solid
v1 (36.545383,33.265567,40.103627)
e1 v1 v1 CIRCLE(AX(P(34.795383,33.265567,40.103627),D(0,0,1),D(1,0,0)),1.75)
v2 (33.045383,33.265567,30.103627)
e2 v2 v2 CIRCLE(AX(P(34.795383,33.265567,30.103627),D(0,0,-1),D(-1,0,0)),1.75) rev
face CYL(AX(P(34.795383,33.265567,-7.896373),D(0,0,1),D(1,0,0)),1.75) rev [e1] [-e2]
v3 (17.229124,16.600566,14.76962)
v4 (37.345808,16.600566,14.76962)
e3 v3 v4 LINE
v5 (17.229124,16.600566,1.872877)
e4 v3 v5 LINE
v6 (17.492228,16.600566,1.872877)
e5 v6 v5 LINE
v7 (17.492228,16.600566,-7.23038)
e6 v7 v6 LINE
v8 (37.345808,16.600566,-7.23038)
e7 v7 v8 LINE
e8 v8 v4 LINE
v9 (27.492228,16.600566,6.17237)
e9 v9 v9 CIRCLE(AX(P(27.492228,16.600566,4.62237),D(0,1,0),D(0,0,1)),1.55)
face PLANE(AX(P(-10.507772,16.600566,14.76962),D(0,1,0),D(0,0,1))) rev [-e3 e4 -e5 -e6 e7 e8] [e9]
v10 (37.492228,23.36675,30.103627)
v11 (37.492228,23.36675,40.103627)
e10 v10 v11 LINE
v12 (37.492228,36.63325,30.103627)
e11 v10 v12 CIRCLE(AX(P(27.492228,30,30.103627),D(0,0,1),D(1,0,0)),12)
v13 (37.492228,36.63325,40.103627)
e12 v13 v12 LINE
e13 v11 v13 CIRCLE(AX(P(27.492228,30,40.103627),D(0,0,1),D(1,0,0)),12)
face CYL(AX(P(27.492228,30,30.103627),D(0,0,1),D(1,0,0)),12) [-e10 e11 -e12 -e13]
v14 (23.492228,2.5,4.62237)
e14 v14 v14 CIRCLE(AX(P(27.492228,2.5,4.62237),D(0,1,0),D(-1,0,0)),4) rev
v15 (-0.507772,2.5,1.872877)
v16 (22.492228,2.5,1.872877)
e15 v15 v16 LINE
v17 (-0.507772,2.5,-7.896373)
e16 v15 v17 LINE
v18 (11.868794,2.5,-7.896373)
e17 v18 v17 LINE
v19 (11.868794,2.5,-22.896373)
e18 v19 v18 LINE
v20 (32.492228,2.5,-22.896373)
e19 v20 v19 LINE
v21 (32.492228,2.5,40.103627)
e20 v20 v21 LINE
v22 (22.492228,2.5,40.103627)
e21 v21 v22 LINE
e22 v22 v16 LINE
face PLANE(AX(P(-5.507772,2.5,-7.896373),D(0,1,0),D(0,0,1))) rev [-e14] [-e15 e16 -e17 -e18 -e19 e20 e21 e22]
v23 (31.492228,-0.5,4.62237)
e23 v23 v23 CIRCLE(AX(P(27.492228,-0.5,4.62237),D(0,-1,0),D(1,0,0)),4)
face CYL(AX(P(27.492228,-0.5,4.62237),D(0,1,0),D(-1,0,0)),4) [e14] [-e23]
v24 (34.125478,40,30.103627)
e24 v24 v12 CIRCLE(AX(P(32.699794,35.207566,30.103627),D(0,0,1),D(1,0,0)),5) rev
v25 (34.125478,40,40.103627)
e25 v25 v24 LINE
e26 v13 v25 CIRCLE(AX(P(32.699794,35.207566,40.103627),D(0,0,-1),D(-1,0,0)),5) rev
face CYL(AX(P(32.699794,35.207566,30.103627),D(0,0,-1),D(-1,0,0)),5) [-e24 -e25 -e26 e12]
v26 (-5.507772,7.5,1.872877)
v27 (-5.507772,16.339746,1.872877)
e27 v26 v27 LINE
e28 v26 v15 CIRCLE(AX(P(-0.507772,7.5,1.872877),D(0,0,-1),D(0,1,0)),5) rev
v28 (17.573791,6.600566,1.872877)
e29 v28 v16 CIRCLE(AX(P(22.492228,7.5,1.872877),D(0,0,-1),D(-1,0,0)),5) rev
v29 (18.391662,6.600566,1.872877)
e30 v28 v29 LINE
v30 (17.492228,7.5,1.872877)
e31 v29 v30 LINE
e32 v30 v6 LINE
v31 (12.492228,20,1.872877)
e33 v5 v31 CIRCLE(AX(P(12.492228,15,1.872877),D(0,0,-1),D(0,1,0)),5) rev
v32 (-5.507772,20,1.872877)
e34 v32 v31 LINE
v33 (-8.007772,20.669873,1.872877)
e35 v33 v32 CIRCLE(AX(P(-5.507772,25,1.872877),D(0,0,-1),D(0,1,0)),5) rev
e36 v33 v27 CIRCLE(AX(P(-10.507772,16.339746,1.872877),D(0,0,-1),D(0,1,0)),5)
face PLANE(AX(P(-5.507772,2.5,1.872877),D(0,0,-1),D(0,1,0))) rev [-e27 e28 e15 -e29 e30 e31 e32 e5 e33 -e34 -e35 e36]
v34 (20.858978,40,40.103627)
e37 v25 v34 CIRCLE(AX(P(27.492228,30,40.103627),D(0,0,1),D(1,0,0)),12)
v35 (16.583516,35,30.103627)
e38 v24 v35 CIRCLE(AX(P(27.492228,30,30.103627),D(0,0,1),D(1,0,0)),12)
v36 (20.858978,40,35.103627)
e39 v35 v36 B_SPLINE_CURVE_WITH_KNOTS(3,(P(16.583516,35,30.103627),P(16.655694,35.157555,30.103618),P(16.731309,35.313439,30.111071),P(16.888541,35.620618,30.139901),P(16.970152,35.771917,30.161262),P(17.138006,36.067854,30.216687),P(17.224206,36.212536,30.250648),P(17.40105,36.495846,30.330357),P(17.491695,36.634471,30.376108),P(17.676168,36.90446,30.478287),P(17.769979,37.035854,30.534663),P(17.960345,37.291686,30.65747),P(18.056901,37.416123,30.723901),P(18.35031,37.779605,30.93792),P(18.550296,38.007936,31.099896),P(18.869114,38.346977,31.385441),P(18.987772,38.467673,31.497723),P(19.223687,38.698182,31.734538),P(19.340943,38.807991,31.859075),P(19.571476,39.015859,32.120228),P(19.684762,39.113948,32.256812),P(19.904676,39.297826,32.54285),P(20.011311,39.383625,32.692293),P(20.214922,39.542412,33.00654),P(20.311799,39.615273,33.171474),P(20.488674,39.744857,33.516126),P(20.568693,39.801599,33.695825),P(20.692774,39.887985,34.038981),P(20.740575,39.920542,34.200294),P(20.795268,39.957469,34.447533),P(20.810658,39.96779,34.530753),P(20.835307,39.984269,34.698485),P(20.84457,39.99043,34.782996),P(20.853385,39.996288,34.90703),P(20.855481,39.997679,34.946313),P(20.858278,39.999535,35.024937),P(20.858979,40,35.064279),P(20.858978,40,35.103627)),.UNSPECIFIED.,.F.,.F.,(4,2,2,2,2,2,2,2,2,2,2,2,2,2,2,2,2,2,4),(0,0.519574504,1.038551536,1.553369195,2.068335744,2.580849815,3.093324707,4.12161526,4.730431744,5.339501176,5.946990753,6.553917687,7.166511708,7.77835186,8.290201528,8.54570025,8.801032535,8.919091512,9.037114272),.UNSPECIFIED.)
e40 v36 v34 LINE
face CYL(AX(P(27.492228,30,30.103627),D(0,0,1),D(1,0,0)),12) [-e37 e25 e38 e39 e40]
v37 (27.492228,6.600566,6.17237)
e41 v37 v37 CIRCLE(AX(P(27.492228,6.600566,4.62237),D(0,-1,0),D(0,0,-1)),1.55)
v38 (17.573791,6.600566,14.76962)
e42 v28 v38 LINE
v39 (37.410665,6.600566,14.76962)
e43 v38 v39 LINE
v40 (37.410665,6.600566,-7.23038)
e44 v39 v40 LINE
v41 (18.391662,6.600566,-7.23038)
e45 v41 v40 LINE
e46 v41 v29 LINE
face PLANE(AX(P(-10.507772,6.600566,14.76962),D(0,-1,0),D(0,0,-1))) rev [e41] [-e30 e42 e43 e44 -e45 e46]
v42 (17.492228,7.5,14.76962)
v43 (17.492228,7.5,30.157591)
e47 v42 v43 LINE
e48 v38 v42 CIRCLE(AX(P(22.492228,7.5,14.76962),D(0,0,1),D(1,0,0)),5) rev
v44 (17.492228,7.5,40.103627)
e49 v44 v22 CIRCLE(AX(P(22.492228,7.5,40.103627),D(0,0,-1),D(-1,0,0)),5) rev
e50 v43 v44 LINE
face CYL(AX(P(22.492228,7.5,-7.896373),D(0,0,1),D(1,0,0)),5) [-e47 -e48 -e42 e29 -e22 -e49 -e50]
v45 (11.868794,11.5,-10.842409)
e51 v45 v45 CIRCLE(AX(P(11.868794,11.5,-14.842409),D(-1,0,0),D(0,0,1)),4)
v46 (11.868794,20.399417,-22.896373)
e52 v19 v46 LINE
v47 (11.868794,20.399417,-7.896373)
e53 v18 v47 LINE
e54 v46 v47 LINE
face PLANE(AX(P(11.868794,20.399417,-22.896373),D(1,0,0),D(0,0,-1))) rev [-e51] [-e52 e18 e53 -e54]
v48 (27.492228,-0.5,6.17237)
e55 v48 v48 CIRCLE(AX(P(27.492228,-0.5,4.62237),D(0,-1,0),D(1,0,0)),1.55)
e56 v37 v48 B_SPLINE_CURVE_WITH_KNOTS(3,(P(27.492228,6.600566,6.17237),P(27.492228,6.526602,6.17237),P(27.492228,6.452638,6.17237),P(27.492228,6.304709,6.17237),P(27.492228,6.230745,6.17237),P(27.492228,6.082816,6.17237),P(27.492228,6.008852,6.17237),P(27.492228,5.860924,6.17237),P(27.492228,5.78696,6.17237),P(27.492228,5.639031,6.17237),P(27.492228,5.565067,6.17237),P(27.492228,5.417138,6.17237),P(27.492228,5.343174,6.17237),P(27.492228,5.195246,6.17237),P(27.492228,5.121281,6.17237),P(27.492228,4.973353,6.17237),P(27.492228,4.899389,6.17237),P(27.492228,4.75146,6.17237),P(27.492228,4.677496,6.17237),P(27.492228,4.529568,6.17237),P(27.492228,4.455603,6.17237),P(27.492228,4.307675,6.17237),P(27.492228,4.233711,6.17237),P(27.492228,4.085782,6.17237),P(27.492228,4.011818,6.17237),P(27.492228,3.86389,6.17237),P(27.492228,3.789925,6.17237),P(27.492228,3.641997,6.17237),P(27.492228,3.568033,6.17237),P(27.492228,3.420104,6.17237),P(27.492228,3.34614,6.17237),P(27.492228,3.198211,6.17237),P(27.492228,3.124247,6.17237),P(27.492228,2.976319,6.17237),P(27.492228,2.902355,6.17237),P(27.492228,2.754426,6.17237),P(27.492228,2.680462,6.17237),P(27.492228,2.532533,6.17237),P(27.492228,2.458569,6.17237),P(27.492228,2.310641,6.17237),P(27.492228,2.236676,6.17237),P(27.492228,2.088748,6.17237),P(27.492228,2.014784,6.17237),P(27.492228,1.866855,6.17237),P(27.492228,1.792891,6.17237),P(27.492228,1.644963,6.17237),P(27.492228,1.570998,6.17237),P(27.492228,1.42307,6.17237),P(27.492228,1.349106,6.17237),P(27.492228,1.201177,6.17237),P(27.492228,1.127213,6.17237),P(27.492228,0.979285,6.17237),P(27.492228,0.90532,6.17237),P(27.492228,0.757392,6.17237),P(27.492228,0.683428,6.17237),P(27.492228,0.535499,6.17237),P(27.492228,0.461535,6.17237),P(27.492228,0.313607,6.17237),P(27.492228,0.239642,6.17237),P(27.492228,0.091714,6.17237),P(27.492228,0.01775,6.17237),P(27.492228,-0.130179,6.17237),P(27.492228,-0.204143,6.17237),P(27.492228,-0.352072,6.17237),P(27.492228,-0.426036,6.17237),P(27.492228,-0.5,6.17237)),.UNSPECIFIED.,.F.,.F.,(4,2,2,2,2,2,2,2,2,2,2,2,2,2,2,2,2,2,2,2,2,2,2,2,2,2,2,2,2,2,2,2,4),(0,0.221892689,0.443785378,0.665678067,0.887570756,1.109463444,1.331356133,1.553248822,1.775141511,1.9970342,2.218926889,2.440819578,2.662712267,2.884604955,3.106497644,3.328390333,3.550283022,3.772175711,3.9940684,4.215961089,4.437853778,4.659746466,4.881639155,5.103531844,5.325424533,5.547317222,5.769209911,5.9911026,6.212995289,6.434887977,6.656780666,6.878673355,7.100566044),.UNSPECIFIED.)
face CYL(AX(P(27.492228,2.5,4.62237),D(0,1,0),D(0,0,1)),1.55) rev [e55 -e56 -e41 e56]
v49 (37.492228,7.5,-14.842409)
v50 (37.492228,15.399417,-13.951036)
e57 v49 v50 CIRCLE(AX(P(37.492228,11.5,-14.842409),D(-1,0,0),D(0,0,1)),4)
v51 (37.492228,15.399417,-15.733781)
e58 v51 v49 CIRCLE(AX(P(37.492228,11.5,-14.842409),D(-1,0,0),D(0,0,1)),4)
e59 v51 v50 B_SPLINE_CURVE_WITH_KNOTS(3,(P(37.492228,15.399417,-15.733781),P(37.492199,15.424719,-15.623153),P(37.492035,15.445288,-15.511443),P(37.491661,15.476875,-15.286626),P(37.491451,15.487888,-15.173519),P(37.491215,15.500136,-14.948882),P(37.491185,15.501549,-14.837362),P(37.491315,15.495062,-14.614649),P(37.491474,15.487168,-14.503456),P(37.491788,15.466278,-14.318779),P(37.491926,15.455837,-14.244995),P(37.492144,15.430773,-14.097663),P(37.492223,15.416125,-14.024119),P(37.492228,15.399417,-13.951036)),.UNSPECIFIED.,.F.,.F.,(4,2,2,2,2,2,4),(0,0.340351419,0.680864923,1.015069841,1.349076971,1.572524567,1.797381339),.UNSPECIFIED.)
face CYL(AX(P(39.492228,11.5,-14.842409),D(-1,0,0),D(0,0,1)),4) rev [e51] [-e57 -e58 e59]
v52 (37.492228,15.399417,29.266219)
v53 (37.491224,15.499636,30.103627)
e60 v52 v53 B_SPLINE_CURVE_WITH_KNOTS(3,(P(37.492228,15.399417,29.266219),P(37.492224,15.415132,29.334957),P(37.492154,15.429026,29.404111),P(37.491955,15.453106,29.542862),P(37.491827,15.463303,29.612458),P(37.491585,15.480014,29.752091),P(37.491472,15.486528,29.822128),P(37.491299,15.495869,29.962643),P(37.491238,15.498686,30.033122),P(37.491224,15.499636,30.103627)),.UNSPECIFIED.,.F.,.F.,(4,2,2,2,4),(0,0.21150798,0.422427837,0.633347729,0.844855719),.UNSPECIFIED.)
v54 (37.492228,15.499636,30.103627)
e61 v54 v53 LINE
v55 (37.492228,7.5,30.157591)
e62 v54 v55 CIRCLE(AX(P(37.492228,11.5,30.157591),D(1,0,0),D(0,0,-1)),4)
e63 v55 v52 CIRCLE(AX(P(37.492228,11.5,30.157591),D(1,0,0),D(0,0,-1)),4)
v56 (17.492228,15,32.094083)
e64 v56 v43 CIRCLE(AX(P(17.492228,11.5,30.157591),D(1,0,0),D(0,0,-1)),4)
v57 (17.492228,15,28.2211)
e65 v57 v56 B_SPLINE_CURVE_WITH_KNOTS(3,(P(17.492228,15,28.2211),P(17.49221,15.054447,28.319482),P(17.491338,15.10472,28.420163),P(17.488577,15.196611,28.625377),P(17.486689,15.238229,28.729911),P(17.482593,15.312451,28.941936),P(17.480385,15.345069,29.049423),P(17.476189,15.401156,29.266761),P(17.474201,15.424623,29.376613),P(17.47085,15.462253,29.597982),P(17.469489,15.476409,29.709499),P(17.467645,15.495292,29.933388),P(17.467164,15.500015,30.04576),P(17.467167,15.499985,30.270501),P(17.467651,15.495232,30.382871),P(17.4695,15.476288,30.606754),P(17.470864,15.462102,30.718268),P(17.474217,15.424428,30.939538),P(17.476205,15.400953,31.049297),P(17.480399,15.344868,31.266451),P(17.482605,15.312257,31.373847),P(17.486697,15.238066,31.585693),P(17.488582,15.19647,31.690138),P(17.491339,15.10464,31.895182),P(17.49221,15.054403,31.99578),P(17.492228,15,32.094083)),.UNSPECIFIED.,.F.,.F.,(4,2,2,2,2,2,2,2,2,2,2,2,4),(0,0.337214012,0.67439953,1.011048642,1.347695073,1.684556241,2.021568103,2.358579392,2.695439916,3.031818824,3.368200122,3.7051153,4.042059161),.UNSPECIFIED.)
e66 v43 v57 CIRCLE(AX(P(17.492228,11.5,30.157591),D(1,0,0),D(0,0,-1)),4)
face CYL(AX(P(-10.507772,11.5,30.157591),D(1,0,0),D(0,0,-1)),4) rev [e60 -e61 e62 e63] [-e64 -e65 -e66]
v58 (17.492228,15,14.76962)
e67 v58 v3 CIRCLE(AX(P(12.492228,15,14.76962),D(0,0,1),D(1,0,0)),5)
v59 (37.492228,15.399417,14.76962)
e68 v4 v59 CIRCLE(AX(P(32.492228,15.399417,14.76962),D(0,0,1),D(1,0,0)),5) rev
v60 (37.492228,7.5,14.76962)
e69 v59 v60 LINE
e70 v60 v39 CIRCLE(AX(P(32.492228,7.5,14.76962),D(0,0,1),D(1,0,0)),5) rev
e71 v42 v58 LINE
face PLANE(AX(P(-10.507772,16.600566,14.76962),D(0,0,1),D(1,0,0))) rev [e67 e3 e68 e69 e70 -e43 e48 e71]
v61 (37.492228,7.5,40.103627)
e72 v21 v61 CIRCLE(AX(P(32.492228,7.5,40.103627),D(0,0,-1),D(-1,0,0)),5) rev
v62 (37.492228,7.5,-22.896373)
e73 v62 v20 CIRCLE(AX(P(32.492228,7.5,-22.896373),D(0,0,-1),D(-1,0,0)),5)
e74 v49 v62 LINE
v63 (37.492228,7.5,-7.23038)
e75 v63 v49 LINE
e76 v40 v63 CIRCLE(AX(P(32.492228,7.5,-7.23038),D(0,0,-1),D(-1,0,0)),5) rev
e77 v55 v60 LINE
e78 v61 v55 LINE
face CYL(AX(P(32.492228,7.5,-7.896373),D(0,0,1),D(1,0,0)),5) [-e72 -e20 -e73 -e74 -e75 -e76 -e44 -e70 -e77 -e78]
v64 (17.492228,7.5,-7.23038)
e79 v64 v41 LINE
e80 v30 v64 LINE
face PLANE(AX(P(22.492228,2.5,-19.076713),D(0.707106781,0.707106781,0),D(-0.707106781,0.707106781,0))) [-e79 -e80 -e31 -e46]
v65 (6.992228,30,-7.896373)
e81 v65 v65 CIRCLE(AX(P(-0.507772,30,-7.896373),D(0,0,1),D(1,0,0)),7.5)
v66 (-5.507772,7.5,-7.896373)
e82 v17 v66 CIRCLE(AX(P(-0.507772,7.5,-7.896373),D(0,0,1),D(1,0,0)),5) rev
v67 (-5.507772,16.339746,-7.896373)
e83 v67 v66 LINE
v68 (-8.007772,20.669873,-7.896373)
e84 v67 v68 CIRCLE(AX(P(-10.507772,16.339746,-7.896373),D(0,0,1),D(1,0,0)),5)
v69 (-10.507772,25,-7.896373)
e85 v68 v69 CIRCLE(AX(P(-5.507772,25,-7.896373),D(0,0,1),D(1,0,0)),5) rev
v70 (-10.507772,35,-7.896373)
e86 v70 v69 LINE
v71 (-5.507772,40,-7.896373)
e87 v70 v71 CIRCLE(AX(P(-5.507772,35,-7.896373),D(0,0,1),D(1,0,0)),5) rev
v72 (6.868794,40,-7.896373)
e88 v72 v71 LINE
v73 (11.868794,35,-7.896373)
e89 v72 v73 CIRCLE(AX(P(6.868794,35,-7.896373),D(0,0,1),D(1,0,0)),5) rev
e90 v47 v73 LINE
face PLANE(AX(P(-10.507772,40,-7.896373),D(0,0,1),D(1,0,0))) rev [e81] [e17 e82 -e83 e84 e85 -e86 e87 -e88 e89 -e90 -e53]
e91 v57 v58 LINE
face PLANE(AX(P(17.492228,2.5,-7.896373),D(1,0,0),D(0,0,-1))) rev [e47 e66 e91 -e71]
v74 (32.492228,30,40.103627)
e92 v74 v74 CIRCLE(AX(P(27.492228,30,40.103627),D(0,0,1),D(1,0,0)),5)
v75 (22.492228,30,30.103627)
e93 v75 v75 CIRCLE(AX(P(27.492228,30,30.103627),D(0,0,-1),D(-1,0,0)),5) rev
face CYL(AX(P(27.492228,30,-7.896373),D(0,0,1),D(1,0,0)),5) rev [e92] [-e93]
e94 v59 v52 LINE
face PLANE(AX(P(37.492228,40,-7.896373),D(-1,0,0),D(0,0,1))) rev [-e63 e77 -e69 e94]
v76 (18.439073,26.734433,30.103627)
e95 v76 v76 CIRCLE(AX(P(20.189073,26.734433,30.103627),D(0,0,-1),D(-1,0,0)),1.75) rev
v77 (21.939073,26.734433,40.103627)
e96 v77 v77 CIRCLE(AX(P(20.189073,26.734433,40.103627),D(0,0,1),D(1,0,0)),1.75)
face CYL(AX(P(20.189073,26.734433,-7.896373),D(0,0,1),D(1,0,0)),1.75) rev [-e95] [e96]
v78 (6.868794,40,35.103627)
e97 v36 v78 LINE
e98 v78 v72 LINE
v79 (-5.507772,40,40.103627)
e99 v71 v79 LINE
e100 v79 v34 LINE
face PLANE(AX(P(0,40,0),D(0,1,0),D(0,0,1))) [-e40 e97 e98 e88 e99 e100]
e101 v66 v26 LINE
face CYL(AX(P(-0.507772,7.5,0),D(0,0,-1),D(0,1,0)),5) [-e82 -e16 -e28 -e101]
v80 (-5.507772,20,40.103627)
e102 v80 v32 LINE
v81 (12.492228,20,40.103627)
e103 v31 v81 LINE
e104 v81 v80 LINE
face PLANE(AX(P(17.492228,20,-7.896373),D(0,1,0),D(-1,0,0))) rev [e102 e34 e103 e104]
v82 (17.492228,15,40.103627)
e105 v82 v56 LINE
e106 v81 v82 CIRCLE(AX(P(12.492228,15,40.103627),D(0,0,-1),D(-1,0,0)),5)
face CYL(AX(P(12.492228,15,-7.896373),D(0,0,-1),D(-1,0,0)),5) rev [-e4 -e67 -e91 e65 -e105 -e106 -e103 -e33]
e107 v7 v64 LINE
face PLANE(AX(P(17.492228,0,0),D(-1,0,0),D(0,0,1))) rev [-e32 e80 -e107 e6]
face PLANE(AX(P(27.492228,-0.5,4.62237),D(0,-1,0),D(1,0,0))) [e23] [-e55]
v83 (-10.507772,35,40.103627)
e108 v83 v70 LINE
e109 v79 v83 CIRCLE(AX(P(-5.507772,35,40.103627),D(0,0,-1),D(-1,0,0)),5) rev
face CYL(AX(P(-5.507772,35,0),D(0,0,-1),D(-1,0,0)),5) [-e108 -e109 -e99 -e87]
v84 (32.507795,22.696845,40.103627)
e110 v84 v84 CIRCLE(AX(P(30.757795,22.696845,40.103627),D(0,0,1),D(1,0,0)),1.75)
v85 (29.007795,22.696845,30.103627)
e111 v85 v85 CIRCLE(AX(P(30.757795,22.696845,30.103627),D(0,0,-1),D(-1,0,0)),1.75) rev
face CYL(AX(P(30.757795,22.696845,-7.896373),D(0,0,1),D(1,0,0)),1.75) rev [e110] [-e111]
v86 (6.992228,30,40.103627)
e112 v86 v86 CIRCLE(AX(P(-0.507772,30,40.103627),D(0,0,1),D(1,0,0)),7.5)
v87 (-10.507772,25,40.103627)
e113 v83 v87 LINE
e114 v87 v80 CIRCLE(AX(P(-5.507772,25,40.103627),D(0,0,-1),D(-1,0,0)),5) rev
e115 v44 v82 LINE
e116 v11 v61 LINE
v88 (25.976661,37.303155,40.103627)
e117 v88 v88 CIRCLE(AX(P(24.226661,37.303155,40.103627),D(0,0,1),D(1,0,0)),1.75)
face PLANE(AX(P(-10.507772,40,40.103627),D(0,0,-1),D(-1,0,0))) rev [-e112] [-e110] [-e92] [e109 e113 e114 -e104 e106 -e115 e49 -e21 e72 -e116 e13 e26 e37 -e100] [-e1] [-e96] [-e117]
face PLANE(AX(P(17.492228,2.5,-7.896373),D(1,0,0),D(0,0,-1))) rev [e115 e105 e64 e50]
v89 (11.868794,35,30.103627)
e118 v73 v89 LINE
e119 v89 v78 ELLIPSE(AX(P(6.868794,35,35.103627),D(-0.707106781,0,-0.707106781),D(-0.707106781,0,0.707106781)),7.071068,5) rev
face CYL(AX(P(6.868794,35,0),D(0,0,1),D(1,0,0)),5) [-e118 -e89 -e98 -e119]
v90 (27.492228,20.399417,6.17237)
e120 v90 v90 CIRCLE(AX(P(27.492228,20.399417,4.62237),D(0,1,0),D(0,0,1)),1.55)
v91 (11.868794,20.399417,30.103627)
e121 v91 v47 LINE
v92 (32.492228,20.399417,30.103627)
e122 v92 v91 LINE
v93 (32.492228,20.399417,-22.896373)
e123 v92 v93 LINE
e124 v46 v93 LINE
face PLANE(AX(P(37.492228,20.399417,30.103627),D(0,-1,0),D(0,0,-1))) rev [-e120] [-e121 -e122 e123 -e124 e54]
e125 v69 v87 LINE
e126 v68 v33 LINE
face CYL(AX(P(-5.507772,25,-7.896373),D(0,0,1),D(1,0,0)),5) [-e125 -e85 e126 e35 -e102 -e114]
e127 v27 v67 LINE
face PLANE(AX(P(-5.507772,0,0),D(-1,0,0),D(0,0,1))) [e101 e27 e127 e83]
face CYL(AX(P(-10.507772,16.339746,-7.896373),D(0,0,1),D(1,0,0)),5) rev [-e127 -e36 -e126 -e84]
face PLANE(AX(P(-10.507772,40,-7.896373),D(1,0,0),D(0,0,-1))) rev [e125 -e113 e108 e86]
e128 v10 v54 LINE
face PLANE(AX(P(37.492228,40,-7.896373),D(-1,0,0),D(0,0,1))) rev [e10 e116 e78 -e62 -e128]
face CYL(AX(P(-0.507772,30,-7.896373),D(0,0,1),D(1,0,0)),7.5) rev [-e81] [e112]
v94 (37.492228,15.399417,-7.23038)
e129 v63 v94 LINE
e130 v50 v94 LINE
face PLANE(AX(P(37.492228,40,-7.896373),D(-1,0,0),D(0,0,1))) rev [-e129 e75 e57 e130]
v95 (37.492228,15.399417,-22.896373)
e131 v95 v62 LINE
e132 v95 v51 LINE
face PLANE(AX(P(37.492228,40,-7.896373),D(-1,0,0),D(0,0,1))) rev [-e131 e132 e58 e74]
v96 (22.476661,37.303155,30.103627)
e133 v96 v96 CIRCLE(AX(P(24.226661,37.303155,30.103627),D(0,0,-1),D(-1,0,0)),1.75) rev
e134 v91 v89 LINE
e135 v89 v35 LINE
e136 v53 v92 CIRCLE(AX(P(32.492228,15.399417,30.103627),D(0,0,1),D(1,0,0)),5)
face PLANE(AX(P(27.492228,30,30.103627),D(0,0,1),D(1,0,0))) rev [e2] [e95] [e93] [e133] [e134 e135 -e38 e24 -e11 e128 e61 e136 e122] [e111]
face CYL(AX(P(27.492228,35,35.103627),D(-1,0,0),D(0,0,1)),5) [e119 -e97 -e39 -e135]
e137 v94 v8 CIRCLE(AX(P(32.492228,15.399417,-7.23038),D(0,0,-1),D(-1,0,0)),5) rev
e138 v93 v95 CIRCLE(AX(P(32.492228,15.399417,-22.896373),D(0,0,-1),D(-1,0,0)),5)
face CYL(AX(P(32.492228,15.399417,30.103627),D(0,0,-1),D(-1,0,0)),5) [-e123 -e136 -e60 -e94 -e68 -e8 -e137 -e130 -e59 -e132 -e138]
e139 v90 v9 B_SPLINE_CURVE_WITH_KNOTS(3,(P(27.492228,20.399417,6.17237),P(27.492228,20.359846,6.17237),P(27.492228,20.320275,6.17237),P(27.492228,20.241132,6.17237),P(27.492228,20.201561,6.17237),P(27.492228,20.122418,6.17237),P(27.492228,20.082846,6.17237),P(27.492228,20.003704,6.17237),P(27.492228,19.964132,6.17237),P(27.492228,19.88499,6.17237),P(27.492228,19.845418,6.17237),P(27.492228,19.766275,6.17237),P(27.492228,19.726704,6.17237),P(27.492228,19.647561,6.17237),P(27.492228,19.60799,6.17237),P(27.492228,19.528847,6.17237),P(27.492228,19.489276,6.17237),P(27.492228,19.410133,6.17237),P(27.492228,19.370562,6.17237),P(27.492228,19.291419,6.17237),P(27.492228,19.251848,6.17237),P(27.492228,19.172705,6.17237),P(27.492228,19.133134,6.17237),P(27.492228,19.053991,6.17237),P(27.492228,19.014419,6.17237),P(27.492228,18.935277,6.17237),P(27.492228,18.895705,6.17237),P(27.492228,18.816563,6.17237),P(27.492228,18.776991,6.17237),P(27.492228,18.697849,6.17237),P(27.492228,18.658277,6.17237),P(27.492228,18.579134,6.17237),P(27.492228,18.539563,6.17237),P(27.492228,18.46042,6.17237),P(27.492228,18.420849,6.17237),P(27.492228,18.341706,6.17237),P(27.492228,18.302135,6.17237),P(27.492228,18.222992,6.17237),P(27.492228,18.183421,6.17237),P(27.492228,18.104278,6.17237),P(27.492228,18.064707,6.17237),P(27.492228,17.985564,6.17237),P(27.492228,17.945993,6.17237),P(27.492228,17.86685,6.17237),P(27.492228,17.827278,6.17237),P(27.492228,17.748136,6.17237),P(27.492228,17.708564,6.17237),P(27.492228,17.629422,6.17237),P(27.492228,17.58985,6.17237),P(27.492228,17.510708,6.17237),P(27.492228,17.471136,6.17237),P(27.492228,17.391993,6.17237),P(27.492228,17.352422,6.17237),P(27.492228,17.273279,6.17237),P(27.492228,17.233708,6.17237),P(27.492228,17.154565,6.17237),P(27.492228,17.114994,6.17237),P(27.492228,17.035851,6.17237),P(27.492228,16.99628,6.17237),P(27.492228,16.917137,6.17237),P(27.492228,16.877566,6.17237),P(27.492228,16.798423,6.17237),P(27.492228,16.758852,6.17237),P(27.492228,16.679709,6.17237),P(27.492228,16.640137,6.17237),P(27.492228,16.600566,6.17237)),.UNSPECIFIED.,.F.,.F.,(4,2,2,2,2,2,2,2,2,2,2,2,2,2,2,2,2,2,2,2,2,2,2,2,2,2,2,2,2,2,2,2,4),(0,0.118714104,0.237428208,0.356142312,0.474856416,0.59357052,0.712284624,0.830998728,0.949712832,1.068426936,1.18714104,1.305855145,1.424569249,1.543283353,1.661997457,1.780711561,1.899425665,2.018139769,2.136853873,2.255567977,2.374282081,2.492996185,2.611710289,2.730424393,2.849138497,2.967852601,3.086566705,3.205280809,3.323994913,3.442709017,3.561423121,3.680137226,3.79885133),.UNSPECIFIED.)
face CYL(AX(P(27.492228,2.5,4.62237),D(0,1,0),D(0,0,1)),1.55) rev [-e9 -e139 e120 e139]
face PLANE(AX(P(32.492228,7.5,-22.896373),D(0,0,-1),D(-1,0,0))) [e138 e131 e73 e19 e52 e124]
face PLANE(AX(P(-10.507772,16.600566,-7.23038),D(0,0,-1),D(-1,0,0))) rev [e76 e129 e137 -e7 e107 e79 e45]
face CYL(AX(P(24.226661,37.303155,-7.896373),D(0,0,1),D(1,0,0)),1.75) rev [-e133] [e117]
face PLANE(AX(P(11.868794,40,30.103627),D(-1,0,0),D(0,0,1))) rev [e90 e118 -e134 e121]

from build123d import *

# Parameters (mm, degrees)
EXTRUDE_1_DEPTH      = 40
SKETCH_2_R           = 7.5
SKETCH_2_R_2         = 4.9999999999999964
SKETCH_2_R_3         = 1.7500000000003626
SKETCH_2_R_4         = 1.7500000000004823
SKETCH_2_R_5         = 1.7500000000000004
SKETCH_2_R_6         = 1.7500000000001783
CUT_EXTRUDE_1_DEPTH  = 73.86746296427441
SKETCH_3_R           = 12.000000000543196
SKETCH_3_R_2         = 5.500000000543195
SKETCH_3_R_3         = 1.750000000000366
SKETCH_3_R_4         = 1.7500000000000004
SKETCH_3_R_5         = 1.7500000000001772
SKETCH_3_R_6         = 1.7500000000004823
EXTRUDE_3_DEPTH      = 10
SKETCH_4_W           = 25.62343390414386
SKETCH_4_H           = 19.600582626289906
CUT_EXTRUDE_2_DEPTH  = 38.00000000000001
FILLET_1_R           = 5
SKETCH_5_W           = 22
SKETCH_5_H           = 10
CUT_EXTRUDE_3_DEPTH  = 76.3412297087783
CUT_EXTRUDE_4_DEPTH  = 76.01757174727166
FILLET_2_R           = 5
EXTRUDE_4_DEPTH      = 23.000000000000007
FILLET_3_R           = 5
FILLET_4_R           = 5
SKETCH_8_R           = 1.5500000000000012
CUT_EXTRUDE_5_DEPTH  = 61.28699815842466
SKETCH_10_R          = 3.9999999999990434
SKETCH_10_R_2        = 1.5500000001559846
EXTRUDE_6_DEPTH      = 3
EXTRUDE_7_DEPTH      = 9.769249944
SKETCH_14_R          = 4.00000000000006
CUT_EXTRUDE_7_DEPTH  = 76.341229817754
EXTRUDE_8_DEPTH      = 15
SKETCH_18_R          = 3.999999999998341
CUT_EXTRUDE_10_DEPTH = 65.30672601787643
SKETCH_16_R          = 3.9999999998192686
CUT_EXTRUDE_8_DEPTH  = 76.341229817754


# Some blends are built 0.0001 mm under size
with BuildPart() as part:
    # 草图1 → 凸台-拉伸1 (new body)
    with BuildSketch(Plane(origin=(0, 0, 0), x_dir=(1, 0, 0), z_dir=(0, 1, 0))):
        Polygon((-10.50777202072539, 7.896373056994778), (37.49222797927462, 7.896373056994778), (37.492227979274624, -40.10362694300522), (-10.507772020725387, -40.10362694300522), align=None)
    extrude(amount=EXTRUDE_1_DEPTH)

    # 草图2 → 切除-拉伸1 (cut, through all)
    with BuildSketch(Plane.XY.offset(40.10362694300522)):
        with Locations((-0.5077720207253867, 30)):
            Circle(SKETCH_2_R)
        with Locations((27.492227979274613, 30)):
            Circle(SKETCH_2_R_2)
        with Locations((24.22666093119229, 37.303154924739225)):
            Circle(SKETCH_2_R_3)
        with Locations((34.79538290399571, 33.26556704810026)):
            Circle(SKETCH_2_R_4)
        with Locations((20.18907305455331, 26.7344329519358)):
            Circle(SKETCH_2_R_5)
        with Locations((30.75779502735674, 22.696845075296828)):
            Circle(SKETCH_2_R_6)
    extrude(amount=-CUT_EXTRUDE_1_DEPTH, mode=Mode.SUBTRACT)

    # 草图3 → 凸台-拉伸3 (add)
    with BuildSketch(Plane.XY.offset(40.10362694300522)):
        with Locations((27.492227979274418, 30.00000000001826)):
            Circle(SKETCH_3_R)
        with Locations((27.492227979274418, 30.00000000001826)):
            Circle(SKETCH_3_R_2, mode=Mode.SUBTRACT)
        with Locations((24.22666093119229, 37.30315492473925)):
            Circle(SKETCH_3_R_3, mode=Mode.SUBTRACT)
        with Locations((20.18907305455331, 26.734432951935826)):
            Circle(SKETCH_3_R_4, mode=Mode.SUBTRACT)
        with Locations((30.75779502735674, 22.696845075296856)):
            Circle(SKETCH_3_R_5, mode=Mode.SUBTRACT)
        with Locations((34.79538290399571, 33.26556704810028)):
            Circle(SKETCH_3_R_6, mode=Mode.SUBTRACT)
    extrude(amount=-EXTRUDE_3_DEPTH)

    # 草图4 → 切除-拉伸2 (cut)
    with BuildSketch(Plane(origin=(0, 0, -7.896373056994778), x_dir=(-1, 0, 0), z_dir=(0, 0, -1))):
        with Locations((-24.680511027202687, 30.199708686855047)):
            Rectangle(SKETCH_4_W, SKETCH_4_H)
    extrude(amount=-CUT_EXTRUDE_2_DEPTH, mode=Mode.SUBTRACT)

    # 圆角1
    # the kernel refuses this fillet: 5 mm, written as the material it takes off along each edge
    with BuildSketch(Plane(origin=(37.492227979274624, 40, 21.686750897283794), x_dir=(0, -1, 0), z_dir=(1.5e-16, 0, 1))) as fillet_1_piece_1:
        with BuildLine():
            CenterArc((4.792434215535032, -4.792434215539004), FILLET_1_R, 106.56702352707134, 56.8659529456977)
            Line((0, -3.366750418279196), (0, 0))
            Line((0, 0), (3.366750418288575, 0))
        make_face()
    extrude(amount=26.833752091442854, mode=Mode.SUBTRACT)

    # 草图5 → 切除-拉伸3 (cut, through all)
    with BuildSketch(Plane(origin=(37.49222797927462, 0, -5.42e-15), x_dir=(-1.4e-16, 0, -1), z_dir=(1, 0, -1.4e-16))):
        with Locations((-3.7696196746029966, 11.600566044145527)):
            Rectangle(SKETCH_5_W, SKETCH_5_H)
    extrude(amount=-CUT_EXTRUDE_3_DEPTH, mode=Mode.SUBTRACT)

    # 草图6 → 切除-拉伸4 (cut, through all)
    with BuildSketch(Plane.XY.offset(40.10362694300522)):
        Polygon((37.492227979274624, 0), (37.492227979274624, 2.5000000000259677), (17.492227979274624, 2.5000000000259655), (17.492227979274624, 20.000000000000004), (-10.507772020725385, 20), (-10.507772020725387, 0), align=None)
    extrude(amount=-CUT_EXTRUDE_4_DEPTH, mode=Mode.SUBTRACT)

    # 圆角2
    # the kernel refuses this fillet: 5 mm, written as the material it adds along each edge
    with BuildSketch(Plane(origin=(17.492227979274624, 20.000000000000004, 40.10362694300522), x_dir=(-1, 0, 0), z_dir=(0, 0, -1))) as fillet_2_piece_1_section:
        with BuildLine():
            CenterArc((FILLET_2_R, -FILLET_2_R), FILLET_2_R, 90, 90)
            Line((0, -FILLET_2_R), (0, 0))
            Line((0, 0), (FILLET_2_R, 0))
        make_face()
    fillet_2_piece_1 = extrude(amount=47.99999999999999, mode=Mode.PRIVATE)
    fillet_2_piece_1 = split(fillet_2_piece_1, bisect_by=Plane(origin=(17.49222797927462, 20.000000000000004, 14.769619674602993), z_dir=(1.4e-16, 0, 1)), keep=Keep.TOP, mode=Mode.PRIVATE)
    fillet_2_piece_1 = split(fillet_2_piece_1, bisect_by=Plane(origin=(17.492227979274624, 16.600566044145527, 40.10362694300522), z_dir=(0, 1, 0)), keep=Keep.TOP, mode=Mode.PRIVATE)
    add(fillet_2_piece_1)
    with BuildSketch(Plane(origin=(17.492227979274624, 20.000000000000004, 40.10362694300522), x_dir=(-1, 0, 0), z_dir=(0, 0, -1))) as fillet_2_piece_2_section:
        with BuildLine():
            CenterArc((FILLET_2_R, -FILLET_2_R), FILLET_2_R, 90, 90)
            Line((0, -FILLET_2_R), (0, 0))
            Line((0, 0), (FILLET_2_R, 0))
        make_face()
    fillet_2_piece_2 = extrude(amount=47.99999999999999, mode=Mode.PRIVATE)
    fillet_2_piece_2 = split(fillet_2_piece_2, bisect_by=Plane(origin=(17.49222797927462, 20.000000000000004, 14.769619674602993), z_dir=(1.4e-16, 0, 1)), keep=Keep.TOP, mode=Mode.PRIVATE)
    fillet_2_piece_2 = split(fillet_2_piece_2, bisect_by=Plane(origin=(17.492227979274624, 16.600566044145527, 40.10362694300522), z_dir=(0, -1, 0)), keep=Keep.TOP, mode=Mode.PRIVATE)
    add(fillet_2_piece_2)
    with BuildSketch(Plane(origin=(17.492227979274624, 20.000000000000004, 40.10362694300522), x_dir=(-1, 0, 0), z_dir=(0, 0, -1))) as fillet_2_piece_3_section:
        with BuildLine():
            CenterArc((FILLET_2_R, -FILLET_2_R), FILLET_2_R, 90, 90)
            Line((0, -FILLET_2_R), (0, 0))
            Line((0, 0), (FILLET_2_R, 0))
        make_face()
    fillet_2_piece_3 = extrude(amount=47.99999999999999, mode=Mode.PRIVATE)
    fillet_2_piece_3 = split(fillet_2_piece_3, bisect_by=Plane(origin=(17.49222797927462, 20.000000000000004, 14.769619674602993), z_dir=(-1.4e-16, 0, -1)), keep=Keep.TOP, mode=Mode.PRIVATE)
    fillet_2_piece_3 = split(fillet_2_piece_3, bisect_by=Plane(origin=(17.492227979274617, 20.000000000000004, -7.230380325397007), z_dir=(1.4e-16, 0, 1)), keep=Keep.TOP, mode=Mode.PRIVATE)
    fillet_2_piece_3 = split(fillet_2_piece_3, bisect_by=Plane(origin=(17.492227979274624, 16.600566044145527, 40.10362694300522), z_dir=(0, 1, 0)), keep=Keep.TOP, mode=Mode.PRIVATE)
    add(fillet_2_piece_3)
    with BuildSketch(Plane(origin=(17.492227979274624, 20.000000000000004, 40.10362694300522), x_dir=(-1, 0, 0), z_dir=(0, 0, -1))) as fillet_2_piece_4_section:
        with BuildLine():
            CenterArc((FILLET_2_R, -FILLET_2_R), FILLET_2_R, 90, 90)
            Line((0, -FILLET_2_R), (0, 0))
            Line((0, 0), (FILLET_2_R, 0))
        make_face()
    fillet_2_piece_4 = extrude(amount=47.99999999999999, mode=Mode.PRIVATE)
    fillet_2_piece_4 = split(fillet_2_piece_4, bisect_by=Plane(origin=(17.492227979274617, 20.000000000000004, -7.230380325397007), z_dir=(-1.4e-16, 0, -1)), keep=Keep.TOP, mode=Mode.PRIVATE)
    fillet_2_piece_4 = split(fillet_2_piece_4, bisect_by=Plane(origin=(17.492227979274624, 16.600566044145527, 40.10362694300522), z_dir=(0, 1, 0)), keep=Keep.TOP, mode=Mode.PRIVATE)
    add(fillet_2_piece_4)
    with BuildSketch(Plane(origin=(17.492227979274624, 20.000000000000004, 40.10362694300522), x_dir=(-1, 0, 0), z_dir=(0, 0, -1))) as fillet_2_piece_5_section:
        with BuildLine():
            CenterArc((FILLET_2_R, -FILLET_2_R), FILLET_2_R, 90, 90)
            Line((0, -FILLET_2_R), (0, 0))
            Line((0, 0), (FILLET_2_R, 0))
        make_face()
    fillet_2_piece_5 = extrude(amount=47.99999999999999, mode=Mode.PRIVATE)
    fillet_2_piece_5 = split(fillet_2_piece_5, bisect_by=Plane(origin=(17.492227979274617, 20.000000000000004, -7.230380325397007), z_dir=(-1.4e-16, 0, -1)), keep=Keep.TOP, mode=Mode.PRIVATE)
    fillet_2_piece_5 = split(fillet_2_piece_5, bisect_by=Plane(origin=(17.492227979274624, 16.600566044145527, 40.10362694300522), z_dir=(0, -1, 0)), keep=Keep.TOP, mode=Mode.PRIVATE)
    add(fillet_2_piece_5)
    # the kernel refuses this fillet: 5 mm, written as the material it takes off along each edge
    with BuildSketch(Plane(origin=(33.358978397553415, 40, 30.103626943005228), x_dir=(0, -1, -7.1e-16), z_dir=(-1, 0, 0))) as fillet_2_2_piece_1_section:
        with BuildLine():
            CenterArc((FILLET_2_R, FILLET_2_R), FILLET_2_R, 180.00000000000003, 90)
            Line((-3.55e-15, FILLET_2_R), (0, 0))
            Line((0, 0), (FILLET_2_R, 0))
        make_face()
    fillet_2_2_piece_1 = extrude(amount=21.49018432242266, mode=Mode.PRIVATE)
    fillet_2_2_piece_1 = fillet_2_2_piece_1 - Plane(origin=(27.492227979274418, 30.00000000001826, 30.103626943005228), x_dir=(1, 0, 0), z_dir=(0, 0, 1)) * Cylinder(12.000000000543196, 63, mode=Mode.PRIVATE)
    add(fillet_2_2_piece_1, mode=Mode.SUBTRACT)
    with BuildSketch(Plane(origin=(11.868794075130754, 40, -20.396373056994783), x_dir=(0, -1, 0), z_dir=(0, 0, 1))) as fillet_2_2_piece_2:
        with BuildLine():
            CenterArc((FILLET_2_R, -FILLET_2_R), FILLET_2_R, 90, 90)
            Line((0, -FILLET_2_R), (0, 0))
            Line((0, 0), (FILLET_2_R, 0))
        make_face()
    extrude(amount=50.500000000000014, mode=Mode.SUBTRACT)
    with BuildSketch(Plane(origin=(37.492227979274624, 2.5000000000259677, 52.603626943005224), x_dir=(-1, -1.8e-16, 0), z_dir=(0, 0, -1))) as fillet_2_2_piece_3:
        with BuildLine():
            CenterArc((FILLET_2_R, FILLET_2_R), FILLET_2_R, 180, 90)
            Line((-8.9e-16, FILLET_2_R), (0, 0))
            Line((0, 0), (FILLET_2_R, 0))
        make_face()
    extrude(amount=73, mode=Mode.SUBTRACT)
    with BuildSketch(Plane(origin=(-10.507772020725385, 40, 52.603626943005224), x_dir=(1, 0, -7e-17), z_dir=(-7e-17, 0, -1))) as fillet_2_2_piece_4:
        with BuildLine():
            CenterArc((FILLET_2_R, FILLET_2_R), FILLET_2_R, 180, 90)
            Line((-1.78e-15, FILLET_2_R), (0, 0))
            Line((0, 0), (FILLET_2_R, 0))
        make_face()
    extrude(amount=73, mode=Mode.SUBTRACT)
    with BuildSketch(Plane(origin=(-10.507772020725385, 20, 52.603626943005224), x_dir=(-7.1e-16, 1, 0), z_dir=(0, 0, -1))) as fillet_2_2_piece_5:
        with BuildLine():
            CenterArc((FILLET_2_R, FILLET_2_R), FILLET_2_R, 179.99999999999997, 90.00000000000006)
            Line((-3.55e-15, FILLET_2_R), (0, 0))
            Line((0, 0), (FILLET_2_R, 0))
        make_face()
    extrude(amount=73, mode=Mode.SUBTRACT)
    with BuildSketch(Plane(origin=(17.492227979274624, 2.5000000000259655, 52.603626943005224), x_dir=(0, 1, 0), z_dir=(0, 0, -1))) as fillet_2_2_piece_6:
        with BuildLine():
            CenterArc((FILLET_2_R, FILLET_2_R), FILLET_2_R, 180, 90)
            Line((1.33e-15, FILLET_2_R), (0, 0))
            Line((0, 0), (FILLET_2_R, 0))
        make_face()
    extrude(amount=73, mode=Mode.SUBTRACT)
    with BuildSketch(Plane(origin=(33.358978397553415, 40, 30.103626943005228), x_dir=(0, -1, -7.1e-16), z_dir=(-1, 0, 0))) as fillet_2_2_piece_7a_section:
        with BuildLine():
            CenterArc((FILLET_2_R, FILLET_2_R), FILLET_2_R, 180.00000000000003, 90)
            Line((-3.55e-15, FILLET_2_R), (0, 0))
            Line((0, 0), (FILLET_2_R, 0))
        make_face()
    fillet_2_2_piece_7a = extrude(amount=33.990184322422664, mode=Mode.PRIVATE)
    fillet_2_2_piece_7a = split(fillet_2_2_piece_7a, bisect_by=Plane(origin=(11.868794075130754, 40, 30.103626943005228), z_dir=(-1, 0, 0)), keep=Keep.TOP, mode=Mode.PRIVATE)
    with BuildSketch(Plane(origin=(11.868794075130754, 40, -20.396373056994783), x_dir=(0, -1, 0), z_dir=(0, 0, 1))) as fillet_2_2_piece_7b_section:
        with BuildLine():
            CenterArc((FILLET_2_R, -FILLET_2_R), FILLET_2_R, 90, 90)
            Line((0, -FILLET_2_R), (0, 0))
            Line((0, 0), (FILLET_2_R, 0))
        make_face()
    fillet_2_2_piece_7b = extrude(amount=63.000000000000014, mode=Mode.PRIVATE)
    fillet_2_2_piece_7b = split(fillet_2_2_piece_7b, bisect_by=Plane(origin=(11.868794075130754, 40, 30.10362694300523), z_dir=(0, 0, 1)), keep=Keep.TOP, mode=Mode.PRIVATE)
    fillet_2_2_piece_7 = fillet_2_2_piece_7a & fillet_2_2_piece_7b
    add(fillet_2_2_piece_7, mode=Mode.SUBTRACT)

    # 草图7 → 凸台-拉伸4 (add)
    with BuildSketch(Plane.ZY.offset(-17.492227979274624)):
        Polygon((-7.896373056994782, 20), (-7.896373056994782, 2.500000000025966), (1.872876886886156, 2.5000000000259672), (1.8728768868861567, 20), align=None)
    extrude(amount=EXTRUDE_4_DEPTH)

    # 圆角3
    fillet_3_edges = [part.edges().sort_by_distance(p)[0] for p in [
        (17.492227979274624, 2.500000000025967, -3.011748085054313),
        (-5.507772020725, 20, -3.0117480850543075),
        (-5.507772020725383, 2.500000000025967, -3.011748085054313),
    ]]
    fillet(fillet_3_edges, radius=FILLET_3_R - 0.0001)  # a hair under: the kernel refuses the full size

    # 圆角4
    # the kernel refuses this fillet: 5 mm, written as the material it takes off along each edge
    with BuildSketch(Plane(origin=(37.49222797927462, 20.399417373710094, -20.396373056994783), x_dir=(-1, 0, 0), z_dir=(0, 0, 1))) as fillet_4_piece_1:
        with BuildLine():
            CenterArc((FILLET_4_R, FILLET_4_R), FILLET_4_R, 180, 90)
            Line((0, FILLET_4_R), (0, 0))
            Line((0, 0), (FILLET_4_R, 0))
        make_face()
    extrude(amount=50.500000000000014, mode=Mode.SUBTRACT)

    # 草图8 → 切除-拉伸5 (cut, through all)
    with BuildSketch(Plane(origin=(0, 20.399417373710094, 0), x_dir=(1, 0, 0), z_dir=(0, 1, 0))):
        with Locations(Location((27.492227980095734, -4.622370103598284, 0), (0, 0, 270))):
            Circle(SKETCH_8_R)
    extrude(amount=-CUT_EXTRUDE_5_DEPTH, mode=Mode.SUBTRACT)

    # 草图10 → 凸台-拉伸6 (add)
    with BuildSketch(Plane.XZ.offset(-2.5000000000259637)):
        with Locations(Location((27.492227980095738, 4.622370103598284, 0), (0, 0, 180))):
            Circle(SKETCH_10_R)
        with Locations(Location((27.492227980095738, 4.622370103598284, 0), (0, 0, 90))):
            Circle(SKETCH_10_R_2, mode=Mode.SUBTRACT)
    extrude(amount=EXTRUDE_6_DEPTH)

    # 草图11 → 凸台-拉伸7 (add)
    with BuildSketch(Plane.XY.offset(1.872876886886156)):
        Polygon((12.492227979274622, 2.5000000000259672), (22.492227979274624, 2.500000000025966), (17.49222797927462, 7.500000000025967), align=None)
    extrude(amount=-EXTRUDE_7_DEPTH)

    # 草图14 → 切除-拉伸7 (cut, through all)
    with BuildSketch(Plane(origin=(37.49222797927462, 0, -5.42e-15), x_dir=(-1.4e-16, 0, -1), z_dir=(1, 0, -1.4e-16))):
        with Locations(Location((-30.15759147547415, 11.50000000055565, 0), (0, 0, 270))):
            Circle(SKETCH_14_R)
    extrude(amount=-CUT_EXTRUDE_7_DEPTH, mode=Mode.SUBTRACT)

    # 草图17 → 凸台-拉伸8 (add)
    with BuildSketch(Plane(origin=(0, 0, -7.896373056994778), x_dir=(-1, 0, 0), z_dir=(0, 0, -1))):
        with BuildLine():
            Line((-11.868794075130754, 20.399417373710094), (-11.868794075130754, 2.500000000025967))
            Line((-11.868794075130754, 2.500000000025967), (-32.49222797927462, 2.5000000000259672))
            ThreePointArc((-32.49222797927462, 2.5000000000259672), (-36.027761885207354, 3.964466094093229), (-37.49222797927462, 7.500000000025965))
            Line((-37.49222797927462, 7.500000000025965), (-37.49222797927462, 15.399417373710092))
            ThreePointArc((-37.49222797927462, 15.399417373710092), (-36.027761885207354, 18.93495127964283), (-32.49222797927462, 20.399417373710094))
            Line((-32.49222797927462, 20.399417373710094), (-11.868794075130754, 20.399417373710094))
        make_face()
    extrude(amount=EXTRUDE_8_DEPTH)

    # 草图18 → 切除-拉伸10 (cut, through all)
    with BuildSketch(Plane.ZY.offset(-11.868794075130754)):
        with Locations((-14.842408524515182, 11.500000000561617)):
            Circle(SKETCH_18_R)
    extrude(amount=-CUT_EXTRUDE_10_DEPTH, mode=Mode.SUBTRACT)

    # 草图16 → 切除-拉伸8 (cut, through all)
    with BuildSketch(Plane(origin=(37.49222797927462, 0, -5.42e-15), x_dir=(-1.4e-16, 0, -1), z_dir=(1, 0, -1.4e-16))):
        with Locations(Location((14.84240852451923, 11.5000000000062, 0), (0, 0, 179.999999992))):
            Circle(SKETCH_16_R)
    extrude(amount=-CUT_EXTRUDE_8_DEPTH, mode=Mode.SUBTRACT)


solid = part.part
